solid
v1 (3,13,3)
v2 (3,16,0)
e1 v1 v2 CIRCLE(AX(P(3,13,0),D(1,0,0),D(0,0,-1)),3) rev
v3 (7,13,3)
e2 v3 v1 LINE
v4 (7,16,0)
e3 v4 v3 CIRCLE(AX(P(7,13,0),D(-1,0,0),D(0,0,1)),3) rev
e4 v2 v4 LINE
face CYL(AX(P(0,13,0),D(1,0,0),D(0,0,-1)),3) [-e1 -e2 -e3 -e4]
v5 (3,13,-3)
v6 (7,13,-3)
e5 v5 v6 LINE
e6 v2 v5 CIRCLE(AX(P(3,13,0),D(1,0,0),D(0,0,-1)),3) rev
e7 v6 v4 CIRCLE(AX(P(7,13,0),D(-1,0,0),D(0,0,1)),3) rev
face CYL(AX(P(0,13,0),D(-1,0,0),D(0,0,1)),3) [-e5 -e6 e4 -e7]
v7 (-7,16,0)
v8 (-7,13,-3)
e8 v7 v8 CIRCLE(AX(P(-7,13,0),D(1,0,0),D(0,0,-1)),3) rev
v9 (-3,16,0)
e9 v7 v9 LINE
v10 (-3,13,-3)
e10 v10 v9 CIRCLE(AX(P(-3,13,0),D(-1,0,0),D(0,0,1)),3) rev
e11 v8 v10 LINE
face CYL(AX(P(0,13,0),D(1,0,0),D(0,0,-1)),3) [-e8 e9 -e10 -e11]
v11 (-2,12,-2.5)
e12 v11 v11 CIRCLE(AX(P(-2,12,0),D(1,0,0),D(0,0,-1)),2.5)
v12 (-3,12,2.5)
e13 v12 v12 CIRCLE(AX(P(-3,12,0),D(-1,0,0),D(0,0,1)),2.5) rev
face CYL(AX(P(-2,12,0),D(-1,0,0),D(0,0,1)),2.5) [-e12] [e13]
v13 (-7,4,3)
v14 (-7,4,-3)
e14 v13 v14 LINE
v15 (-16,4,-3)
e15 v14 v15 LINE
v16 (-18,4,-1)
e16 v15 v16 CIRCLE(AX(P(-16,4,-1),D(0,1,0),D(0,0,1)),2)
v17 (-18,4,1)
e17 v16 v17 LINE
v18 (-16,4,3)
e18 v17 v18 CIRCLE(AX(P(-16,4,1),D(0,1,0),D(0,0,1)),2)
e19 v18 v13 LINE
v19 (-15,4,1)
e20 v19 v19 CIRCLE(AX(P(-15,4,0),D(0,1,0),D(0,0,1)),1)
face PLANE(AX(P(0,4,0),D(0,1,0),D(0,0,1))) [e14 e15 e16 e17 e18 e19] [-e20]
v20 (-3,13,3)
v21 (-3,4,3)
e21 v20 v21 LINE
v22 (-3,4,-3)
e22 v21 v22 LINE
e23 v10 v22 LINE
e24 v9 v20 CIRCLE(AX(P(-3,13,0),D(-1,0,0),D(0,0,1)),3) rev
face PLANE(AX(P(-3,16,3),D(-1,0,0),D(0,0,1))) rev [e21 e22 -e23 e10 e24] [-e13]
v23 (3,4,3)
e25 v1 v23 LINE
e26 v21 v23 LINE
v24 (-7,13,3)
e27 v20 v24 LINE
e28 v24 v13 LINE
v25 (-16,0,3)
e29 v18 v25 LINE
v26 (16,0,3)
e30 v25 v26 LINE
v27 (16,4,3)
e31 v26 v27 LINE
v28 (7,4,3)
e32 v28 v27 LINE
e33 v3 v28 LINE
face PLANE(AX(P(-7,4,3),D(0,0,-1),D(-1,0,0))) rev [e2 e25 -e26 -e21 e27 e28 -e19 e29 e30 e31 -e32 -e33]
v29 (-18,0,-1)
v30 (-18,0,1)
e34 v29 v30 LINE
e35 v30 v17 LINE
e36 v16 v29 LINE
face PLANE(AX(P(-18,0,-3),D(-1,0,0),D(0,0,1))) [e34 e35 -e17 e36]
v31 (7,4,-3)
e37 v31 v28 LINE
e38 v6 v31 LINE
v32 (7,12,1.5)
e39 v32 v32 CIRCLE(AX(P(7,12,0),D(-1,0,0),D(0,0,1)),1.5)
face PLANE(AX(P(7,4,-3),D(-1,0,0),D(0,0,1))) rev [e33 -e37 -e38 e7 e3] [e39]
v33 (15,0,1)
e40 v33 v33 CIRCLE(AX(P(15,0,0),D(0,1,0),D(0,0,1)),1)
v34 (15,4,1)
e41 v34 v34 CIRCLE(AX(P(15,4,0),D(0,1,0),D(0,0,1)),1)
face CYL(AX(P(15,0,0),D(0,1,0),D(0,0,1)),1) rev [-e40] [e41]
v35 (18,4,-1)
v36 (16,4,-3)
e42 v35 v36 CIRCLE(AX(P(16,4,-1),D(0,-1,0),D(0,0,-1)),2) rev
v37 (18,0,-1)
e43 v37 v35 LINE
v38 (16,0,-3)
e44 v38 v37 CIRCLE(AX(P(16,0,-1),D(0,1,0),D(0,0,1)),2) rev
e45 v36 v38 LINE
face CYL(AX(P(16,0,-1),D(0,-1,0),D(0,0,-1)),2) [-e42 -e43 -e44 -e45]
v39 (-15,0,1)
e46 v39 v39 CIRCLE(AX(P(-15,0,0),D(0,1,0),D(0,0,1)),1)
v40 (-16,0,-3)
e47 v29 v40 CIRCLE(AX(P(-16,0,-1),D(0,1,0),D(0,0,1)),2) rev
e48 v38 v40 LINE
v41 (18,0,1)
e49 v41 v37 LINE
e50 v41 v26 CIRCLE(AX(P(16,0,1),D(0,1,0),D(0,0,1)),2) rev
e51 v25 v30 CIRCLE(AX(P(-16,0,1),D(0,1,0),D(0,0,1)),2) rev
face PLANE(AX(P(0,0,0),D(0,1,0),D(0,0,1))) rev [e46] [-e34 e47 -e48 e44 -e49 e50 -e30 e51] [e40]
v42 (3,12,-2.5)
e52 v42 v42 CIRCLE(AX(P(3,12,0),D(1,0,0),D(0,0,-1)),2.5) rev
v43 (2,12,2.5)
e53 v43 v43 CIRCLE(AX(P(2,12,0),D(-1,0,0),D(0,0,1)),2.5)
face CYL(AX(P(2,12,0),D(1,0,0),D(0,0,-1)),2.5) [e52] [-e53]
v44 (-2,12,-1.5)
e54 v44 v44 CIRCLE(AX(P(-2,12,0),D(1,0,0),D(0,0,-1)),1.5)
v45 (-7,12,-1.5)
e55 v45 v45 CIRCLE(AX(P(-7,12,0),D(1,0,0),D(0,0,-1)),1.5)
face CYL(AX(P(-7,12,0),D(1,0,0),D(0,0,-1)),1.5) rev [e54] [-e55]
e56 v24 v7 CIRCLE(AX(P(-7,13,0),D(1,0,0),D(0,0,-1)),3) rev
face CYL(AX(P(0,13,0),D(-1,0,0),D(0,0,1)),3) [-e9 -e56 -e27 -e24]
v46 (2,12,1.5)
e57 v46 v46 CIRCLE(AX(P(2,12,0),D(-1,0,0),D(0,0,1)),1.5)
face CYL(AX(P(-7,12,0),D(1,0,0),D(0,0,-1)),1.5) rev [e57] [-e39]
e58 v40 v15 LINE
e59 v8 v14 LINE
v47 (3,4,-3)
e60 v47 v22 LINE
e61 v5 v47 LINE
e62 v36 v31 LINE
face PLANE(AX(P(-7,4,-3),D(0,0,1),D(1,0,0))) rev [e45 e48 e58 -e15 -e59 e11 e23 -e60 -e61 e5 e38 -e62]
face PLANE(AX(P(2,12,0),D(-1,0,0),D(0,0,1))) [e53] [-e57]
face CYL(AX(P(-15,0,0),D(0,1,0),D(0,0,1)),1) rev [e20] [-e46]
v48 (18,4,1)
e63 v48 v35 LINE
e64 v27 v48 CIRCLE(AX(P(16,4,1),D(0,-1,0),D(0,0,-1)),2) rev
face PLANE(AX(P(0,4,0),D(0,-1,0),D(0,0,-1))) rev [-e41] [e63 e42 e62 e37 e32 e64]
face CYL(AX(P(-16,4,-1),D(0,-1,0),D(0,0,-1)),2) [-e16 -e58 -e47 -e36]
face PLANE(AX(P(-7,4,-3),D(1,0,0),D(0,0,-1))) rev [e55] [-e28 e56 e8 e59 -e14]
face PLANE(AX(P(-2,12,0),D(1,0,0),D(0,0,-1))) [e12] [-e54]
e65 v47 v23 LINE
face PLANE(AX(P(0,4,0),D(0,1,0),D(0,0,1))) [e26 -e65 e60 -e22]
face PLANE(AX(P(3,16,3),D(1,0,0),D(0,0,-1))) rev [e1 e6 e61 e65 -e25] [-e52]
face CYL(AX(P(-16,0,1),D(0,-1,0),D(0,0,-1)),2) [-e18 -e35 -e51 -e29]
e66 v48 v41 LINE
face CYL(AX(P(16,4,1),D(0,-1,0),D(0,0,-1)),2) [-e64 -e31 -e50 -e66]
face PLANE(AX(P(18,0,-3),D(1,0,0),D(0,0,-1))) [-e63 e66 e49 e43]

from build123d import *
from build123d.topology import SkipClean

# Parameters (mm, degrees)
SKETCH2_W               = 14
SKETCH2_H               = 6
BOSS_EXTRUDE1_DEPTH     = 4
SKETCH3_W               = 4
SKETCH3_H               = 6
BOSS_EXTRUDE2_DEPTH     = 12
CUT_EXTRUDE1_DEPTH      = 22.470910554
CUT_EXTRUDE1_DEPTH_BACK = 22.470910554
SKETCH4_R               = 1.5
BOSS_EXTRUDE3_START     = 1
SKETCH5_R               = 2.5
SKETCH5_R_2             = 1.5
BOSS_EXTRUDE3_DEPTH     = 1
SKETCH6_R               = 2.5
SKETCH6_R_2             = 1.5
BOSS_EXTRUDE4_DEPTH     = 1
SKETCH7_W               = 11
SKETCH7_H               = 6
SKETCH7_R               = 1
BOSS_EXTRUDE5_DEPTH     = 4
FILLET1_R               = 2
FILLET2_R               = 3


with BuildPart() as part:
    # Sketch2 → Boss-Extrude1 (new body)
    with BuildSketch(Plane(origin=(0, 0, 0), x_dir=(1, 0, 0), z_dir=(0, 1, 0))):
        Rectangle(SKETCH2_W, SKETCH2_H)
    extrude(amount=BOSS_EXTRUDE1_DEPTH)

    # Sketch3 → Boss-Extrude2 (add)
    with BuildSketch(Plane(origin=(0, 4, 0), x_dir=(1, 0, 0), z_dir=(0, 1, 0))):
        with Locations((-5, 0)):
            Rectangle(SKETCH3_W, SKETCH3_H)
        with Locations((5, 0)):
            Rectangle(SKETCH3_W, SKETCH3_H)
    extrude(amount=BOSS_EXTRUDE2_DEPTH)

    # Sketch4 → Cut-Extrude1 (cut, two sides: drawn at the far end of the back side and taken through both)
    with BuildSketch(Plane(origin=(7, 0, 0), x_dir=(0, 0, -1), z_dir=(1, 0, 0)).offset(-CUT_EXTRUDE1_DEPTH_BACK)):
        with Locations((0, 12)):
            Circle(SKETCH4_R)
    extrude(amount=CUT_EXTRUDE1_DEPTH + CUT_EXTRUDE1_DEPTH_BACK, mode=Mode.SUBTRACT)

    # Sketch5 → Boss-Extrude3 (add)
    with BuildSketch(Plane(origin=(-3, 0, 0), x_dir=(0, 0, -1), z_dir=(1, 0, 0)).offset(BOSS_EXTRUDE3_START)):
        with Locations(Location((0, 12, 0), (0, 0, 180))):
            Circle(SKETCH5_R)
        with Locations((0, 12)):
            Circle(SKETCH5_R_2, mode=Mode.SUBTRACT)
    extrude(amount=-BOSS_EXTRUDE3_DEPTH)

    # Sketch6 → Boss-Extrude4 (add)
    with SkipClean():  # the faces are left unmerged after this step: merging them gives an invalid solid
        with BuildSketch(Plane.ZY.offset(-3)):
            with Locations((0, 12)):
                Circle(SKETCH6_R)
            with Locations((0, 12)):
                Circle(SKETCH6_R_2, mode=Mode.SUBTRACT)
        extrude(amount=BOSS_EXTRUDE4_DEPTH)

    # Sketch7 → Boss-Extrude5 (add)
    # profile 1 of 2: a face of its own
    with SkipClean():  # the faces are left unmerged after this step: merging them gives an invalid solid
        with BuildSketch(Plane(origin=(0, 4, 0), x_dir=(1, 0, 0), z_dir=(0, 1, 0))):
            with Locations((12.5, 0)):
                Rectangle(SKETCH7_W, SKETCH7_H)
            with Locations(Location((15, 0, 0), (0, 0, 270))):
                Circle(SKETCH7_R, mode=Mode.SUBTRACT)
        # profile 2 of 2: a face of its own
        with BuildSketch(Plane(origin=(0, 4, 0), x_dir=(1, 0, 0), z_dir=(0, 1, 0))):
            with Locations((-12.5, 0)):
                Rectangle(SKETCH7_W, SKETCH7_H)
            with Locations(Location((-15, 0, 0), (0, 0, 270))):
                Circle(SKETCH7_R, mode=Mode.SUBTRACT)
        extrude(amount=-BOSS_EXTRUDE5_DEPTH)

    # Fillet1
    fillet1_edges = [part.edges().sort_by_distance(p)[0] for p in [
        (18, 2, -3),
        (18, 2, 3),
        (-18, 2, 3),
        (-18, 2, -3),
    ]]
    fillet(fillet1_edges, radius=FILLET1_R)

    # Fillet2
    fillet2_edges = [part.edges().sort_by_distance(p)[0] for p in [
        (-5, 16, -3),
        (5, 16, -3),
        (5, 16, 3),
        (-5, 16, 3),
    ]]
    fillet(fillet2_edges, radius=FILLET2_R - 0.0001)  # a hair under: the kernel refuses the full size


solid = part.part
